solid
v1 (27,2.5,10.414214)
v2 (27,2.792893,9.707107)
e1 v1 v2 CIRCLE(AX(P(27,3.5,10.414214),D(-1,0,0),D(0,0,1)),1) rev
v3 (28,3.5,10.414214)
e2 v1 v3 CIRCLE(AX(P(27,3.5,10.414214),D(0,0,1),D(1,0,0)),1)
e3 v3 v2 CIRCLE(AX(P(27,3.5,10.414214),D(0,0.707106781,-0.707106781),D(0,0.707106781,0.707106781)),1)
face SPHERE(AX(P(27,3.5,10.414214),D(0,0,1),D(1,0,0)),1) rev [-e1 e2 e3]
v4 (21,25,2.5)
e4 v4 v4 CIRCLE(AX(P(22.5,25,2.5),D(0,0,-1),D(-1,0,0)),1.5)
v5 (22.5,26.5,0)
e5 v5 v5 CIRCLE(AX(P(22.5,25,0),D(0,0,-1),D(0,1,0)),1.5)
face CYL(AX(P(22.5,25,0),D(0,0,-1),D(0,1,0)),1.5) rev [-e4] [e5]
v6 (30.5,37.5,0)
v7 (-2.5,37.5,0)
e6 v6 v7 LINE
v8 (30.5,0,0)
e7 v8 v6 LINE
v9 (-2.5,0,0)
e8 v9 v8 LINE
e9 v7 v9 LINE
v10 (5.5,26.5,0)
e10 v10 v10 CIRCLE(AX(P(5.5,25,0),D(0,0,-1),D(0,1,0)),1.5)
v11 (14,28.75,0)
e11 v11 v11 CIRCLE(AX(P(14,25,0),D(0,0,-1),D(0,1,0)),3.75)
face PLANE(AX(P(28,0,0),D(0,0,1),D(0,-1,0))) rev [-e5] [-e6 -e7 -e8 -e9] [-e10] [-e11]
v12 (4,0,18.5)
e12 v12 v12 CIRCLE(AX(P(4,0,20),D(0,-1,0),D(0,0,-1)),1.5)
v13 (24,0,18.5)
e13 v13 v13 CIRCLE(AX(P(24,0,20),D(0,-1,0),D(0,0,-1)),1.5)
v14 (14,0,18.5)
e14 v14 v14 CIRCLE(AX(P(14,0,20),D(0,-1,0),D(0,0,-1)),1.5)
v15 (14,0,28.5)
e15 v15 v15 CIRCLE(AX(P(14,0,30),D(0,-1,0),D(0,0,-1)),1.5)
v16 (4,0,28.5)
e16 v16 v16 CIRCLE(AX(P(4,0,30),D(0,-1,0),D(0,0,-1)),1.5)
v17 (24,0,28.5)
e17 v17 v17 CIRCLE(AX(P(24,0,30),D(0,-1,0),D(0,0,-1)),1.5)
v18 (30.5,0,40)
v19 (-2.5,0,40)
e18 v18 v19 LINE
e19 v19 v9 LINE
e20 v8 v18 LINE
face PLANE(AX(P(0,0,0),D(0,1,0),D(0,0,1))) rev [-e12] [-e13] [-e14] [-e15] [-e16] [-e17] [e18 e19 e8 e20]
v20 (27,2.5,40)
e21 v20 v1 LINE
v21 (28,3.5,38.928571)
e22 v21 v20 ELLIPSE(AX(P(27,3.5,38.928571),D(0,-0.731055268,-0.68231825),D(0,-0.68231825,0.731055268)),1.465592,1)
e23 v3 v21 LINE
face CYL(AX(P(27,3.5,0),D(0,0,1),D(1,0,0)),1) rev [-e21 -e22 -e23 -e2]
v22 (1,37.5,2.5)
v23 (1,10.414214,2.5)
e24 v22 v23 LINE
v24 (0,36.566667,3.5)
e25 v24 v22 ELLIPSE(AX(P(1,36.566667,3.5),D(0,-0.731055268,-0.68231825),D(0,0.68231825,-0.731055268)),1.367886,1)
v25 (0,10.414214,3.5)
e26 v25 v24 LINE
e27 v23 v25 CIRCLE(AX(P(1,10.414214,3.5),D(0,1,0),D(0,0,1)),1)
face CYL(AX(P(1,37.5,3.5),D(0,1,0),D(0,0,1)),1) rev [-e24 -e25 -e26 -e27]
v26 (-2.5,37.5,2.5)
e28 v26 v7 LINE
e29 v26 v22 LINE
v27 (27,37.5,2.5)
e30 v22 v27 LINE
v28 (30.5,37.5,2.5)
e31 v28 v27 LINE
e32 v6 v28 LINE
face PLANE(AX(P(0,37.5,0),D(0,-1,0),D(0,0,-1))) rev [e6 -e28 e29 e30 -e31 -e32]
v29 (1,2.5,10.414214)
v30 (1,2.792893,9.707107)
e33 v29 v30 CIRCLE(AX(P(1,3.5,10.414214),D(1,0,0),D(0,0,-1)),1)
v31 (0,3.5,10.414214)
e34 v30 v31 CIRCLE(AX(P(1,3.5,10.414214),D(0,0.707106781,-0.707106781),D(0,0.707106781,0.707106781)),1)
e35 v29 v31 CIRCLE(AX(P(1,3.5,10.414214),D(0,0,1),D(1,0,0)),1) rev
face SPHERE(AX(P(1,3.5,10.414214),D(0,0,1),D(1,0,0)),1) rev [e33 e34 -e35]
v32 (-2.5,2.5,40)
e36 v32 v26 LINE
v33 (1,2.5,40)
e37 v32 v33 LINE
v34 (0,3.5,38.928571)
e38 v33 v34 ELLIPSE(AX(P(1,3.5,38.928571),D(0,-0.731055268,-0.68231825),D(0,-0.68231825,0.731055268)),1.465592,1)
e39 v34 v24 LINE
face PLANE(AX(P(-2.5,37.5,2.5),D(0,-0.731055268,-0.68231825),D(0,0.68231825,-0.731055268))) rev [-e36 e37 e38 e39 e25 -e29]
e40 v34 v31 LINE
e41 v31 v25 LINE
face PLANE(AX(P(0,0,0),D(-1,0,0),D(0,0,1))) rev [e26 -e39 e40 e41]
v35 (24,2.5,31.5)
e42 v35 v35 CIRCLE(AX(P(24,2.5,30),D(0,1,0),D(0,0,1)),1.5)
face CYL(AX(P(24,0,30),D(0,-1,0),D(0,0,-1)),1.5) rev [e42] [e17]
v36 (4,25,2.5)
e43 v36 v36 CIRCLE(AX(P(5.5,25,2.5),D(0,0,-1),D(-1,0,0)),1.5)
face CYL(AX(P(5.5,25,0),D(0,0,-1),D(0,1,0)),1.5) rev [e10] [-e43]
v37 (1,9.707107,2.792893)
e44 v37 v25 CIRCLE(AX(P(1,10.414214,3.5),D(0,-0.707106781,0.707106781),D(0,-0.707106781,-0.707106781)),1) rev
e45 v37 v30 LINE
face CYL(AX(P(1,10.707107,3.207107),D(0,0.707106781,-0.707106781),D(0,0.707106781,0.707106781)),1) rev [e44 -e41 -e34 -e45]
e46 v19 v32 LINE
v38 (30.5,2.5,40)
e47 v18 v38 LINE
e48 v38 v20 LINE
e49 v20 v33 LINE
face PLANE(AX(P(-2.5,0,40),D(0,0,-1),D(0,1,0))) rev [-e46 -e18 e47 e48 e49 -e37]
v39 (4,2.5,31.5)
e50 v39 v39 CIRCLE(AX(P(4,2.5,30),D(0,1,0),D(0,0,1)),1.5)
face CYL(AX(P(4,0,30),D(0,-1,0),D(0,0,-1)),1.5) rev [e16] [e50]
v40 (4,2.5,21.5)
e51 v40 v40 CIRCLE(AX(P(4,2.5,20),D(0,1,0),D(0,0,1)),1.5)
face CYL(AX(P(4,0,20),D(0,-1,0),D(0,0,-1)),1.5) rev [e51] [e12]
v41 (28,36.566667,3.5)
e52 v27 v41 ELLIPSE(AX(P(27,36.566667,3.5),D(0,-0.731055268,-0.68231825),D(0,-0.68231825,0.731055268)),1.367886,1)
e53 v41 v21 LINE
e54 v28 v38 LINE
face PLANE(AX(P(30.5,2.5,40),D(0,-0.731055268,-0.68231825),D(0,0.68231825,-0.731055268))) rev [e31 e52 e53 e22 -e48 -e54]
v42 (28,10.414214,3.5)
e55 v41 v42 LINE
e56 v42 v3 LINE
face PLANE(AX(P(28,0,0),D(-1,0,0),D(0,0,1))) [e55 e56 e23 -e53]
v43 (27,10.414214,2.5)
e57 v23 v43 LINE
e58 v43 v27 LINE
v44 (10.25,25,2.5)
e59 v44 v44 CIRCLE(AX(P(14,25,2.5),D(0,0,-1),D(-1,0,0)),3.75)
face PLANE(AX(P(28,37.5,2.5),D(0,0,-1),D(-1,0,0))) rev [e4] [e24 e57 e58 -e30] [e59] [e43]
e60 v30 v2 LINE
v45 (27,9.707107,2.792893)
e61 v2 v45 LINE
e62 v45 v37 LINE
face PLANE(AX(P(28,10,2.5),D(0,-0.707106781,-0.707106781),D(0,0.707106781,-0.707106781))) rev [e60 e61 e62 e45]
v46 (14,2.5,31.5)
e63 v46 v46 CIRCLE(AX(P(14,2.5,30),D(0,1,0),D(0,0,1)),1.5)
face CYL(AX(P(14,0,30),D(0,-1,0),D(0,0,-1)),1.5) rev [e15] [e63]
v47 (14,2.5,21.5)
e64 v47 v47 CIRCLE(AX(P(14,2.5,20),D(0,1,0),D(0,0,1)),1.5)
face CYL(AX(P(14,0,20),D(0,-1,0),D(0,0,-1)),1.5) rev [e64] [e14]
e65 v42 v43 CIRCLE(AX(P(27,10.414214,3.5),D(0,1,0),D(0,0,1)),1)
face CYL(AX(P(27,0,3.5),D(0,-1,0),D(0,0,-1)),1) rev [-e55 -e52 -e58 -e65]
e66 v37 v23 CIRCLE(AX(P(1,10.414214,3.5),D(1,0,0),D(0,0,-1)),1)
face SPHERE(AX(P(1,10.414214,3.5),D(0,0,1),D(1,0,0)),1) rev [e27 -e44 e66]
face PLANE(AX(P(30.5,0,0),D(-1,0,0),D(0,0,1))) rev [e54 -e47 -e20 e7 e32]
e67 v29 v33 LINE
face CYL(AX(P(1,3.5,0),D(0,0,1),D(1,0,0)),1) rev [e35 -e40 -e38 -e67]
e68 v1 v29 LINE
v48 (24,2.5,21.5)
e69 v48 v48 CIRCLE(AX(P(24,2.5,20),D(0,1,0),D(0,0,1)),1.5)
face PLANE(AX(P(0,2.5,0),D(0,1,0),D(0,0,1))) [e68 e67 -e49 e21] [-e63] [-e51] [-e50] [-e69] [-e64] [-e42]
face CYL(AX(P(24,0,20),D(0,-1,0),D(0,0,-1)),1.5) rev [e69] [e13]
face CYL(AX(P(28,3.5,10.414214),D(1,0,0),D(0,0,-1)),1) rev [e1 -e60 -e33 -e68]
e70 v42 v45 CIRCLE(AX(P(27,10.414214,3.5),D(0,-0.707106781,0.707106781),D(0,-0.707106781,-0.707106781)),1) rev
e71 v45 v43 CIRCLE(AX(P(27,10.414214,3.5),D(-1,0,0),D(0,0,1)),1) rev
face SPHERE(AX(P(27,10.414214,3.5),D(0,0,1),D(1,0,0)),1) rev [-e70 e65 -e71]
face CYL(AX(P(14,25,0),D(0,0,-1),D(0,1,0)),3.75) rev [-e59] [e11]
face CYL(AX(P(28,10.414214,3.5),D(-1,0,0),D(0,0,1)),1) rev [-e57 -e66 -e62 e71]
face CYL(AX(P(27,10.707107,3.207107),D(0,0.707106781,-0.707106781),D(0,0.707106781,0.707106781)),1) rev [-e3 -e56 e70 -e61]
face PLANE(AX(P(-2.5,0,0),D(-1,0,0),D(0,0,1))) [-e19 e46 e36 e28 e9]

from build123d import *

# Parameters (mm, degrees)
BOSS_EXTRUDE1_DEPTH            = 28
BOSS_EXTRUDE2_DEPTH            = 2.5
BOSS_EXTRUDE3_DEPTH            = 2.5
SKETCH4_W                      = 33
SKETCH4_H                      = 40
BOSS_EXTRUDE4_DEPTH            = 2.5
F_3_0_3_DIAMETER_HOLE1_D       = 3
F_3_0_3_DIAMETER_HOLE1_DEPTH   = 37.500025
F_7_5_7_5_DIAMETER_HOLE1_D     = 7.5
F_7_5_7_5_DIAMETER_HOLE1_DEPTH = 40
F_3_0_3_DIAMETER_HOLE2_D       = 3
F_3_0_3_DIAMETER_HOLE2_DEPTH   = 40
FILLET1_R                      = 1


with BuildPart() as part:
    # Boss-Extrude1: read off the stored shape, not the designer's step
    # Boss-Extrude1 outline → Boss-Extrude1 (new body)
    with BuildSketch(Plane.YZ):
        Polygon((2.5, 0), (37.5, 0), (37.5, 2.5), (10, 2.5), (2.5, 10), align=None)
    extrude(amount=BOSS_EXTRUDE1_DEPTH)

    # Sketch2 → Boss-Extrude2 (add)
    with BuildSketch(Plane(origin=(28, 0, 0), x_dir=(0, 0, -1), z_dir=(1, 0, 0))):
        Polygon((0, 2.5), (-40, 2.5), (-2.5, 37.5), (0, 37.5), align=None)
    extrude(amount=BOSS_EXTRUDE2_DEPTH)

    # Sketch3 → Boss-Extrude3 (add)
    with BuildSketch(Plane.ZY):
        Polygon((40, 2.5), (0, 2.5), (0, 37.5), (2.5, 37.5), align=None)
    extrude(amount=BOSS_EXTRUDE3_DEPTH)

    # Sketch4 → Boss-Extrude4 (add)
    with BuildSketch(Plane.XZ.offset(-2.5)):
        with Locations((14, 20)):
            Rectangle(SKETCH4_W, SKETCH4_H)
    extrude(amount=BOSS_EXTRUDE4_DEPTH)

    # Ø3.0 (3) Diameter Hole1
    with Locations(Plane(origin=(0, 0, 0), x_dir=(-1, 0, 0), z_dir=(0, -1, 0))):
        with Locations((-4, -30), (-4, -20), (-14, -30), (-14, -20), (-24, -30), (-24, -20)):
            Hole(F_3_0_3_DIAMETER_HOLE1_D / 2, depth=F_3_0_3_DIAMETER_HOLE1_DEPTH)

    # Ø7.5 (7.5) Diameter Hole1
    with Locations(Plane(origin=(0, 0, 0), x_dir=(-1, 0, 0), z_dir=(0, 0, -1))):
        with Locations((-14, 25)):
            Hole(F_7_5_7_5_DIAMETER_HOLE1_D / 2, depth=F_7_5_7_5_DIAMETER_HOLE1_DEPTH)

    # Ø3.0 (3) Diameter Hole2
    with Locations(Plane(origin=(0, 0, 0), x_dir=(-1, 0, 0), z_dir=(0, 0, -1))):
        with Locations((-22.5, 25), (-5.5, 25)):
            Hole(F_3_0_3_DIAMETER_HOLE2_D / 2, depth=F_3_0_3_DIAMETER_HOLE2_DEPTH)

    # Fillet1
    fillet1_edges = [part.edges().sort_by_distance(p)[0] for p in [
        (14, 2.5, 10),
        (0, 6.25, 6.25),
        (28, 6.25, 6.25),
        (14, 10, 2.5),
        (0, 23.75, 2.5),
        (28, 23.75, 2.5),
        (28, 2.5, 25),
        (0, 2.5, 25),
    ]]
    fillet(fillet1_edges, radius=FILLET1_R)


solid = part.part
